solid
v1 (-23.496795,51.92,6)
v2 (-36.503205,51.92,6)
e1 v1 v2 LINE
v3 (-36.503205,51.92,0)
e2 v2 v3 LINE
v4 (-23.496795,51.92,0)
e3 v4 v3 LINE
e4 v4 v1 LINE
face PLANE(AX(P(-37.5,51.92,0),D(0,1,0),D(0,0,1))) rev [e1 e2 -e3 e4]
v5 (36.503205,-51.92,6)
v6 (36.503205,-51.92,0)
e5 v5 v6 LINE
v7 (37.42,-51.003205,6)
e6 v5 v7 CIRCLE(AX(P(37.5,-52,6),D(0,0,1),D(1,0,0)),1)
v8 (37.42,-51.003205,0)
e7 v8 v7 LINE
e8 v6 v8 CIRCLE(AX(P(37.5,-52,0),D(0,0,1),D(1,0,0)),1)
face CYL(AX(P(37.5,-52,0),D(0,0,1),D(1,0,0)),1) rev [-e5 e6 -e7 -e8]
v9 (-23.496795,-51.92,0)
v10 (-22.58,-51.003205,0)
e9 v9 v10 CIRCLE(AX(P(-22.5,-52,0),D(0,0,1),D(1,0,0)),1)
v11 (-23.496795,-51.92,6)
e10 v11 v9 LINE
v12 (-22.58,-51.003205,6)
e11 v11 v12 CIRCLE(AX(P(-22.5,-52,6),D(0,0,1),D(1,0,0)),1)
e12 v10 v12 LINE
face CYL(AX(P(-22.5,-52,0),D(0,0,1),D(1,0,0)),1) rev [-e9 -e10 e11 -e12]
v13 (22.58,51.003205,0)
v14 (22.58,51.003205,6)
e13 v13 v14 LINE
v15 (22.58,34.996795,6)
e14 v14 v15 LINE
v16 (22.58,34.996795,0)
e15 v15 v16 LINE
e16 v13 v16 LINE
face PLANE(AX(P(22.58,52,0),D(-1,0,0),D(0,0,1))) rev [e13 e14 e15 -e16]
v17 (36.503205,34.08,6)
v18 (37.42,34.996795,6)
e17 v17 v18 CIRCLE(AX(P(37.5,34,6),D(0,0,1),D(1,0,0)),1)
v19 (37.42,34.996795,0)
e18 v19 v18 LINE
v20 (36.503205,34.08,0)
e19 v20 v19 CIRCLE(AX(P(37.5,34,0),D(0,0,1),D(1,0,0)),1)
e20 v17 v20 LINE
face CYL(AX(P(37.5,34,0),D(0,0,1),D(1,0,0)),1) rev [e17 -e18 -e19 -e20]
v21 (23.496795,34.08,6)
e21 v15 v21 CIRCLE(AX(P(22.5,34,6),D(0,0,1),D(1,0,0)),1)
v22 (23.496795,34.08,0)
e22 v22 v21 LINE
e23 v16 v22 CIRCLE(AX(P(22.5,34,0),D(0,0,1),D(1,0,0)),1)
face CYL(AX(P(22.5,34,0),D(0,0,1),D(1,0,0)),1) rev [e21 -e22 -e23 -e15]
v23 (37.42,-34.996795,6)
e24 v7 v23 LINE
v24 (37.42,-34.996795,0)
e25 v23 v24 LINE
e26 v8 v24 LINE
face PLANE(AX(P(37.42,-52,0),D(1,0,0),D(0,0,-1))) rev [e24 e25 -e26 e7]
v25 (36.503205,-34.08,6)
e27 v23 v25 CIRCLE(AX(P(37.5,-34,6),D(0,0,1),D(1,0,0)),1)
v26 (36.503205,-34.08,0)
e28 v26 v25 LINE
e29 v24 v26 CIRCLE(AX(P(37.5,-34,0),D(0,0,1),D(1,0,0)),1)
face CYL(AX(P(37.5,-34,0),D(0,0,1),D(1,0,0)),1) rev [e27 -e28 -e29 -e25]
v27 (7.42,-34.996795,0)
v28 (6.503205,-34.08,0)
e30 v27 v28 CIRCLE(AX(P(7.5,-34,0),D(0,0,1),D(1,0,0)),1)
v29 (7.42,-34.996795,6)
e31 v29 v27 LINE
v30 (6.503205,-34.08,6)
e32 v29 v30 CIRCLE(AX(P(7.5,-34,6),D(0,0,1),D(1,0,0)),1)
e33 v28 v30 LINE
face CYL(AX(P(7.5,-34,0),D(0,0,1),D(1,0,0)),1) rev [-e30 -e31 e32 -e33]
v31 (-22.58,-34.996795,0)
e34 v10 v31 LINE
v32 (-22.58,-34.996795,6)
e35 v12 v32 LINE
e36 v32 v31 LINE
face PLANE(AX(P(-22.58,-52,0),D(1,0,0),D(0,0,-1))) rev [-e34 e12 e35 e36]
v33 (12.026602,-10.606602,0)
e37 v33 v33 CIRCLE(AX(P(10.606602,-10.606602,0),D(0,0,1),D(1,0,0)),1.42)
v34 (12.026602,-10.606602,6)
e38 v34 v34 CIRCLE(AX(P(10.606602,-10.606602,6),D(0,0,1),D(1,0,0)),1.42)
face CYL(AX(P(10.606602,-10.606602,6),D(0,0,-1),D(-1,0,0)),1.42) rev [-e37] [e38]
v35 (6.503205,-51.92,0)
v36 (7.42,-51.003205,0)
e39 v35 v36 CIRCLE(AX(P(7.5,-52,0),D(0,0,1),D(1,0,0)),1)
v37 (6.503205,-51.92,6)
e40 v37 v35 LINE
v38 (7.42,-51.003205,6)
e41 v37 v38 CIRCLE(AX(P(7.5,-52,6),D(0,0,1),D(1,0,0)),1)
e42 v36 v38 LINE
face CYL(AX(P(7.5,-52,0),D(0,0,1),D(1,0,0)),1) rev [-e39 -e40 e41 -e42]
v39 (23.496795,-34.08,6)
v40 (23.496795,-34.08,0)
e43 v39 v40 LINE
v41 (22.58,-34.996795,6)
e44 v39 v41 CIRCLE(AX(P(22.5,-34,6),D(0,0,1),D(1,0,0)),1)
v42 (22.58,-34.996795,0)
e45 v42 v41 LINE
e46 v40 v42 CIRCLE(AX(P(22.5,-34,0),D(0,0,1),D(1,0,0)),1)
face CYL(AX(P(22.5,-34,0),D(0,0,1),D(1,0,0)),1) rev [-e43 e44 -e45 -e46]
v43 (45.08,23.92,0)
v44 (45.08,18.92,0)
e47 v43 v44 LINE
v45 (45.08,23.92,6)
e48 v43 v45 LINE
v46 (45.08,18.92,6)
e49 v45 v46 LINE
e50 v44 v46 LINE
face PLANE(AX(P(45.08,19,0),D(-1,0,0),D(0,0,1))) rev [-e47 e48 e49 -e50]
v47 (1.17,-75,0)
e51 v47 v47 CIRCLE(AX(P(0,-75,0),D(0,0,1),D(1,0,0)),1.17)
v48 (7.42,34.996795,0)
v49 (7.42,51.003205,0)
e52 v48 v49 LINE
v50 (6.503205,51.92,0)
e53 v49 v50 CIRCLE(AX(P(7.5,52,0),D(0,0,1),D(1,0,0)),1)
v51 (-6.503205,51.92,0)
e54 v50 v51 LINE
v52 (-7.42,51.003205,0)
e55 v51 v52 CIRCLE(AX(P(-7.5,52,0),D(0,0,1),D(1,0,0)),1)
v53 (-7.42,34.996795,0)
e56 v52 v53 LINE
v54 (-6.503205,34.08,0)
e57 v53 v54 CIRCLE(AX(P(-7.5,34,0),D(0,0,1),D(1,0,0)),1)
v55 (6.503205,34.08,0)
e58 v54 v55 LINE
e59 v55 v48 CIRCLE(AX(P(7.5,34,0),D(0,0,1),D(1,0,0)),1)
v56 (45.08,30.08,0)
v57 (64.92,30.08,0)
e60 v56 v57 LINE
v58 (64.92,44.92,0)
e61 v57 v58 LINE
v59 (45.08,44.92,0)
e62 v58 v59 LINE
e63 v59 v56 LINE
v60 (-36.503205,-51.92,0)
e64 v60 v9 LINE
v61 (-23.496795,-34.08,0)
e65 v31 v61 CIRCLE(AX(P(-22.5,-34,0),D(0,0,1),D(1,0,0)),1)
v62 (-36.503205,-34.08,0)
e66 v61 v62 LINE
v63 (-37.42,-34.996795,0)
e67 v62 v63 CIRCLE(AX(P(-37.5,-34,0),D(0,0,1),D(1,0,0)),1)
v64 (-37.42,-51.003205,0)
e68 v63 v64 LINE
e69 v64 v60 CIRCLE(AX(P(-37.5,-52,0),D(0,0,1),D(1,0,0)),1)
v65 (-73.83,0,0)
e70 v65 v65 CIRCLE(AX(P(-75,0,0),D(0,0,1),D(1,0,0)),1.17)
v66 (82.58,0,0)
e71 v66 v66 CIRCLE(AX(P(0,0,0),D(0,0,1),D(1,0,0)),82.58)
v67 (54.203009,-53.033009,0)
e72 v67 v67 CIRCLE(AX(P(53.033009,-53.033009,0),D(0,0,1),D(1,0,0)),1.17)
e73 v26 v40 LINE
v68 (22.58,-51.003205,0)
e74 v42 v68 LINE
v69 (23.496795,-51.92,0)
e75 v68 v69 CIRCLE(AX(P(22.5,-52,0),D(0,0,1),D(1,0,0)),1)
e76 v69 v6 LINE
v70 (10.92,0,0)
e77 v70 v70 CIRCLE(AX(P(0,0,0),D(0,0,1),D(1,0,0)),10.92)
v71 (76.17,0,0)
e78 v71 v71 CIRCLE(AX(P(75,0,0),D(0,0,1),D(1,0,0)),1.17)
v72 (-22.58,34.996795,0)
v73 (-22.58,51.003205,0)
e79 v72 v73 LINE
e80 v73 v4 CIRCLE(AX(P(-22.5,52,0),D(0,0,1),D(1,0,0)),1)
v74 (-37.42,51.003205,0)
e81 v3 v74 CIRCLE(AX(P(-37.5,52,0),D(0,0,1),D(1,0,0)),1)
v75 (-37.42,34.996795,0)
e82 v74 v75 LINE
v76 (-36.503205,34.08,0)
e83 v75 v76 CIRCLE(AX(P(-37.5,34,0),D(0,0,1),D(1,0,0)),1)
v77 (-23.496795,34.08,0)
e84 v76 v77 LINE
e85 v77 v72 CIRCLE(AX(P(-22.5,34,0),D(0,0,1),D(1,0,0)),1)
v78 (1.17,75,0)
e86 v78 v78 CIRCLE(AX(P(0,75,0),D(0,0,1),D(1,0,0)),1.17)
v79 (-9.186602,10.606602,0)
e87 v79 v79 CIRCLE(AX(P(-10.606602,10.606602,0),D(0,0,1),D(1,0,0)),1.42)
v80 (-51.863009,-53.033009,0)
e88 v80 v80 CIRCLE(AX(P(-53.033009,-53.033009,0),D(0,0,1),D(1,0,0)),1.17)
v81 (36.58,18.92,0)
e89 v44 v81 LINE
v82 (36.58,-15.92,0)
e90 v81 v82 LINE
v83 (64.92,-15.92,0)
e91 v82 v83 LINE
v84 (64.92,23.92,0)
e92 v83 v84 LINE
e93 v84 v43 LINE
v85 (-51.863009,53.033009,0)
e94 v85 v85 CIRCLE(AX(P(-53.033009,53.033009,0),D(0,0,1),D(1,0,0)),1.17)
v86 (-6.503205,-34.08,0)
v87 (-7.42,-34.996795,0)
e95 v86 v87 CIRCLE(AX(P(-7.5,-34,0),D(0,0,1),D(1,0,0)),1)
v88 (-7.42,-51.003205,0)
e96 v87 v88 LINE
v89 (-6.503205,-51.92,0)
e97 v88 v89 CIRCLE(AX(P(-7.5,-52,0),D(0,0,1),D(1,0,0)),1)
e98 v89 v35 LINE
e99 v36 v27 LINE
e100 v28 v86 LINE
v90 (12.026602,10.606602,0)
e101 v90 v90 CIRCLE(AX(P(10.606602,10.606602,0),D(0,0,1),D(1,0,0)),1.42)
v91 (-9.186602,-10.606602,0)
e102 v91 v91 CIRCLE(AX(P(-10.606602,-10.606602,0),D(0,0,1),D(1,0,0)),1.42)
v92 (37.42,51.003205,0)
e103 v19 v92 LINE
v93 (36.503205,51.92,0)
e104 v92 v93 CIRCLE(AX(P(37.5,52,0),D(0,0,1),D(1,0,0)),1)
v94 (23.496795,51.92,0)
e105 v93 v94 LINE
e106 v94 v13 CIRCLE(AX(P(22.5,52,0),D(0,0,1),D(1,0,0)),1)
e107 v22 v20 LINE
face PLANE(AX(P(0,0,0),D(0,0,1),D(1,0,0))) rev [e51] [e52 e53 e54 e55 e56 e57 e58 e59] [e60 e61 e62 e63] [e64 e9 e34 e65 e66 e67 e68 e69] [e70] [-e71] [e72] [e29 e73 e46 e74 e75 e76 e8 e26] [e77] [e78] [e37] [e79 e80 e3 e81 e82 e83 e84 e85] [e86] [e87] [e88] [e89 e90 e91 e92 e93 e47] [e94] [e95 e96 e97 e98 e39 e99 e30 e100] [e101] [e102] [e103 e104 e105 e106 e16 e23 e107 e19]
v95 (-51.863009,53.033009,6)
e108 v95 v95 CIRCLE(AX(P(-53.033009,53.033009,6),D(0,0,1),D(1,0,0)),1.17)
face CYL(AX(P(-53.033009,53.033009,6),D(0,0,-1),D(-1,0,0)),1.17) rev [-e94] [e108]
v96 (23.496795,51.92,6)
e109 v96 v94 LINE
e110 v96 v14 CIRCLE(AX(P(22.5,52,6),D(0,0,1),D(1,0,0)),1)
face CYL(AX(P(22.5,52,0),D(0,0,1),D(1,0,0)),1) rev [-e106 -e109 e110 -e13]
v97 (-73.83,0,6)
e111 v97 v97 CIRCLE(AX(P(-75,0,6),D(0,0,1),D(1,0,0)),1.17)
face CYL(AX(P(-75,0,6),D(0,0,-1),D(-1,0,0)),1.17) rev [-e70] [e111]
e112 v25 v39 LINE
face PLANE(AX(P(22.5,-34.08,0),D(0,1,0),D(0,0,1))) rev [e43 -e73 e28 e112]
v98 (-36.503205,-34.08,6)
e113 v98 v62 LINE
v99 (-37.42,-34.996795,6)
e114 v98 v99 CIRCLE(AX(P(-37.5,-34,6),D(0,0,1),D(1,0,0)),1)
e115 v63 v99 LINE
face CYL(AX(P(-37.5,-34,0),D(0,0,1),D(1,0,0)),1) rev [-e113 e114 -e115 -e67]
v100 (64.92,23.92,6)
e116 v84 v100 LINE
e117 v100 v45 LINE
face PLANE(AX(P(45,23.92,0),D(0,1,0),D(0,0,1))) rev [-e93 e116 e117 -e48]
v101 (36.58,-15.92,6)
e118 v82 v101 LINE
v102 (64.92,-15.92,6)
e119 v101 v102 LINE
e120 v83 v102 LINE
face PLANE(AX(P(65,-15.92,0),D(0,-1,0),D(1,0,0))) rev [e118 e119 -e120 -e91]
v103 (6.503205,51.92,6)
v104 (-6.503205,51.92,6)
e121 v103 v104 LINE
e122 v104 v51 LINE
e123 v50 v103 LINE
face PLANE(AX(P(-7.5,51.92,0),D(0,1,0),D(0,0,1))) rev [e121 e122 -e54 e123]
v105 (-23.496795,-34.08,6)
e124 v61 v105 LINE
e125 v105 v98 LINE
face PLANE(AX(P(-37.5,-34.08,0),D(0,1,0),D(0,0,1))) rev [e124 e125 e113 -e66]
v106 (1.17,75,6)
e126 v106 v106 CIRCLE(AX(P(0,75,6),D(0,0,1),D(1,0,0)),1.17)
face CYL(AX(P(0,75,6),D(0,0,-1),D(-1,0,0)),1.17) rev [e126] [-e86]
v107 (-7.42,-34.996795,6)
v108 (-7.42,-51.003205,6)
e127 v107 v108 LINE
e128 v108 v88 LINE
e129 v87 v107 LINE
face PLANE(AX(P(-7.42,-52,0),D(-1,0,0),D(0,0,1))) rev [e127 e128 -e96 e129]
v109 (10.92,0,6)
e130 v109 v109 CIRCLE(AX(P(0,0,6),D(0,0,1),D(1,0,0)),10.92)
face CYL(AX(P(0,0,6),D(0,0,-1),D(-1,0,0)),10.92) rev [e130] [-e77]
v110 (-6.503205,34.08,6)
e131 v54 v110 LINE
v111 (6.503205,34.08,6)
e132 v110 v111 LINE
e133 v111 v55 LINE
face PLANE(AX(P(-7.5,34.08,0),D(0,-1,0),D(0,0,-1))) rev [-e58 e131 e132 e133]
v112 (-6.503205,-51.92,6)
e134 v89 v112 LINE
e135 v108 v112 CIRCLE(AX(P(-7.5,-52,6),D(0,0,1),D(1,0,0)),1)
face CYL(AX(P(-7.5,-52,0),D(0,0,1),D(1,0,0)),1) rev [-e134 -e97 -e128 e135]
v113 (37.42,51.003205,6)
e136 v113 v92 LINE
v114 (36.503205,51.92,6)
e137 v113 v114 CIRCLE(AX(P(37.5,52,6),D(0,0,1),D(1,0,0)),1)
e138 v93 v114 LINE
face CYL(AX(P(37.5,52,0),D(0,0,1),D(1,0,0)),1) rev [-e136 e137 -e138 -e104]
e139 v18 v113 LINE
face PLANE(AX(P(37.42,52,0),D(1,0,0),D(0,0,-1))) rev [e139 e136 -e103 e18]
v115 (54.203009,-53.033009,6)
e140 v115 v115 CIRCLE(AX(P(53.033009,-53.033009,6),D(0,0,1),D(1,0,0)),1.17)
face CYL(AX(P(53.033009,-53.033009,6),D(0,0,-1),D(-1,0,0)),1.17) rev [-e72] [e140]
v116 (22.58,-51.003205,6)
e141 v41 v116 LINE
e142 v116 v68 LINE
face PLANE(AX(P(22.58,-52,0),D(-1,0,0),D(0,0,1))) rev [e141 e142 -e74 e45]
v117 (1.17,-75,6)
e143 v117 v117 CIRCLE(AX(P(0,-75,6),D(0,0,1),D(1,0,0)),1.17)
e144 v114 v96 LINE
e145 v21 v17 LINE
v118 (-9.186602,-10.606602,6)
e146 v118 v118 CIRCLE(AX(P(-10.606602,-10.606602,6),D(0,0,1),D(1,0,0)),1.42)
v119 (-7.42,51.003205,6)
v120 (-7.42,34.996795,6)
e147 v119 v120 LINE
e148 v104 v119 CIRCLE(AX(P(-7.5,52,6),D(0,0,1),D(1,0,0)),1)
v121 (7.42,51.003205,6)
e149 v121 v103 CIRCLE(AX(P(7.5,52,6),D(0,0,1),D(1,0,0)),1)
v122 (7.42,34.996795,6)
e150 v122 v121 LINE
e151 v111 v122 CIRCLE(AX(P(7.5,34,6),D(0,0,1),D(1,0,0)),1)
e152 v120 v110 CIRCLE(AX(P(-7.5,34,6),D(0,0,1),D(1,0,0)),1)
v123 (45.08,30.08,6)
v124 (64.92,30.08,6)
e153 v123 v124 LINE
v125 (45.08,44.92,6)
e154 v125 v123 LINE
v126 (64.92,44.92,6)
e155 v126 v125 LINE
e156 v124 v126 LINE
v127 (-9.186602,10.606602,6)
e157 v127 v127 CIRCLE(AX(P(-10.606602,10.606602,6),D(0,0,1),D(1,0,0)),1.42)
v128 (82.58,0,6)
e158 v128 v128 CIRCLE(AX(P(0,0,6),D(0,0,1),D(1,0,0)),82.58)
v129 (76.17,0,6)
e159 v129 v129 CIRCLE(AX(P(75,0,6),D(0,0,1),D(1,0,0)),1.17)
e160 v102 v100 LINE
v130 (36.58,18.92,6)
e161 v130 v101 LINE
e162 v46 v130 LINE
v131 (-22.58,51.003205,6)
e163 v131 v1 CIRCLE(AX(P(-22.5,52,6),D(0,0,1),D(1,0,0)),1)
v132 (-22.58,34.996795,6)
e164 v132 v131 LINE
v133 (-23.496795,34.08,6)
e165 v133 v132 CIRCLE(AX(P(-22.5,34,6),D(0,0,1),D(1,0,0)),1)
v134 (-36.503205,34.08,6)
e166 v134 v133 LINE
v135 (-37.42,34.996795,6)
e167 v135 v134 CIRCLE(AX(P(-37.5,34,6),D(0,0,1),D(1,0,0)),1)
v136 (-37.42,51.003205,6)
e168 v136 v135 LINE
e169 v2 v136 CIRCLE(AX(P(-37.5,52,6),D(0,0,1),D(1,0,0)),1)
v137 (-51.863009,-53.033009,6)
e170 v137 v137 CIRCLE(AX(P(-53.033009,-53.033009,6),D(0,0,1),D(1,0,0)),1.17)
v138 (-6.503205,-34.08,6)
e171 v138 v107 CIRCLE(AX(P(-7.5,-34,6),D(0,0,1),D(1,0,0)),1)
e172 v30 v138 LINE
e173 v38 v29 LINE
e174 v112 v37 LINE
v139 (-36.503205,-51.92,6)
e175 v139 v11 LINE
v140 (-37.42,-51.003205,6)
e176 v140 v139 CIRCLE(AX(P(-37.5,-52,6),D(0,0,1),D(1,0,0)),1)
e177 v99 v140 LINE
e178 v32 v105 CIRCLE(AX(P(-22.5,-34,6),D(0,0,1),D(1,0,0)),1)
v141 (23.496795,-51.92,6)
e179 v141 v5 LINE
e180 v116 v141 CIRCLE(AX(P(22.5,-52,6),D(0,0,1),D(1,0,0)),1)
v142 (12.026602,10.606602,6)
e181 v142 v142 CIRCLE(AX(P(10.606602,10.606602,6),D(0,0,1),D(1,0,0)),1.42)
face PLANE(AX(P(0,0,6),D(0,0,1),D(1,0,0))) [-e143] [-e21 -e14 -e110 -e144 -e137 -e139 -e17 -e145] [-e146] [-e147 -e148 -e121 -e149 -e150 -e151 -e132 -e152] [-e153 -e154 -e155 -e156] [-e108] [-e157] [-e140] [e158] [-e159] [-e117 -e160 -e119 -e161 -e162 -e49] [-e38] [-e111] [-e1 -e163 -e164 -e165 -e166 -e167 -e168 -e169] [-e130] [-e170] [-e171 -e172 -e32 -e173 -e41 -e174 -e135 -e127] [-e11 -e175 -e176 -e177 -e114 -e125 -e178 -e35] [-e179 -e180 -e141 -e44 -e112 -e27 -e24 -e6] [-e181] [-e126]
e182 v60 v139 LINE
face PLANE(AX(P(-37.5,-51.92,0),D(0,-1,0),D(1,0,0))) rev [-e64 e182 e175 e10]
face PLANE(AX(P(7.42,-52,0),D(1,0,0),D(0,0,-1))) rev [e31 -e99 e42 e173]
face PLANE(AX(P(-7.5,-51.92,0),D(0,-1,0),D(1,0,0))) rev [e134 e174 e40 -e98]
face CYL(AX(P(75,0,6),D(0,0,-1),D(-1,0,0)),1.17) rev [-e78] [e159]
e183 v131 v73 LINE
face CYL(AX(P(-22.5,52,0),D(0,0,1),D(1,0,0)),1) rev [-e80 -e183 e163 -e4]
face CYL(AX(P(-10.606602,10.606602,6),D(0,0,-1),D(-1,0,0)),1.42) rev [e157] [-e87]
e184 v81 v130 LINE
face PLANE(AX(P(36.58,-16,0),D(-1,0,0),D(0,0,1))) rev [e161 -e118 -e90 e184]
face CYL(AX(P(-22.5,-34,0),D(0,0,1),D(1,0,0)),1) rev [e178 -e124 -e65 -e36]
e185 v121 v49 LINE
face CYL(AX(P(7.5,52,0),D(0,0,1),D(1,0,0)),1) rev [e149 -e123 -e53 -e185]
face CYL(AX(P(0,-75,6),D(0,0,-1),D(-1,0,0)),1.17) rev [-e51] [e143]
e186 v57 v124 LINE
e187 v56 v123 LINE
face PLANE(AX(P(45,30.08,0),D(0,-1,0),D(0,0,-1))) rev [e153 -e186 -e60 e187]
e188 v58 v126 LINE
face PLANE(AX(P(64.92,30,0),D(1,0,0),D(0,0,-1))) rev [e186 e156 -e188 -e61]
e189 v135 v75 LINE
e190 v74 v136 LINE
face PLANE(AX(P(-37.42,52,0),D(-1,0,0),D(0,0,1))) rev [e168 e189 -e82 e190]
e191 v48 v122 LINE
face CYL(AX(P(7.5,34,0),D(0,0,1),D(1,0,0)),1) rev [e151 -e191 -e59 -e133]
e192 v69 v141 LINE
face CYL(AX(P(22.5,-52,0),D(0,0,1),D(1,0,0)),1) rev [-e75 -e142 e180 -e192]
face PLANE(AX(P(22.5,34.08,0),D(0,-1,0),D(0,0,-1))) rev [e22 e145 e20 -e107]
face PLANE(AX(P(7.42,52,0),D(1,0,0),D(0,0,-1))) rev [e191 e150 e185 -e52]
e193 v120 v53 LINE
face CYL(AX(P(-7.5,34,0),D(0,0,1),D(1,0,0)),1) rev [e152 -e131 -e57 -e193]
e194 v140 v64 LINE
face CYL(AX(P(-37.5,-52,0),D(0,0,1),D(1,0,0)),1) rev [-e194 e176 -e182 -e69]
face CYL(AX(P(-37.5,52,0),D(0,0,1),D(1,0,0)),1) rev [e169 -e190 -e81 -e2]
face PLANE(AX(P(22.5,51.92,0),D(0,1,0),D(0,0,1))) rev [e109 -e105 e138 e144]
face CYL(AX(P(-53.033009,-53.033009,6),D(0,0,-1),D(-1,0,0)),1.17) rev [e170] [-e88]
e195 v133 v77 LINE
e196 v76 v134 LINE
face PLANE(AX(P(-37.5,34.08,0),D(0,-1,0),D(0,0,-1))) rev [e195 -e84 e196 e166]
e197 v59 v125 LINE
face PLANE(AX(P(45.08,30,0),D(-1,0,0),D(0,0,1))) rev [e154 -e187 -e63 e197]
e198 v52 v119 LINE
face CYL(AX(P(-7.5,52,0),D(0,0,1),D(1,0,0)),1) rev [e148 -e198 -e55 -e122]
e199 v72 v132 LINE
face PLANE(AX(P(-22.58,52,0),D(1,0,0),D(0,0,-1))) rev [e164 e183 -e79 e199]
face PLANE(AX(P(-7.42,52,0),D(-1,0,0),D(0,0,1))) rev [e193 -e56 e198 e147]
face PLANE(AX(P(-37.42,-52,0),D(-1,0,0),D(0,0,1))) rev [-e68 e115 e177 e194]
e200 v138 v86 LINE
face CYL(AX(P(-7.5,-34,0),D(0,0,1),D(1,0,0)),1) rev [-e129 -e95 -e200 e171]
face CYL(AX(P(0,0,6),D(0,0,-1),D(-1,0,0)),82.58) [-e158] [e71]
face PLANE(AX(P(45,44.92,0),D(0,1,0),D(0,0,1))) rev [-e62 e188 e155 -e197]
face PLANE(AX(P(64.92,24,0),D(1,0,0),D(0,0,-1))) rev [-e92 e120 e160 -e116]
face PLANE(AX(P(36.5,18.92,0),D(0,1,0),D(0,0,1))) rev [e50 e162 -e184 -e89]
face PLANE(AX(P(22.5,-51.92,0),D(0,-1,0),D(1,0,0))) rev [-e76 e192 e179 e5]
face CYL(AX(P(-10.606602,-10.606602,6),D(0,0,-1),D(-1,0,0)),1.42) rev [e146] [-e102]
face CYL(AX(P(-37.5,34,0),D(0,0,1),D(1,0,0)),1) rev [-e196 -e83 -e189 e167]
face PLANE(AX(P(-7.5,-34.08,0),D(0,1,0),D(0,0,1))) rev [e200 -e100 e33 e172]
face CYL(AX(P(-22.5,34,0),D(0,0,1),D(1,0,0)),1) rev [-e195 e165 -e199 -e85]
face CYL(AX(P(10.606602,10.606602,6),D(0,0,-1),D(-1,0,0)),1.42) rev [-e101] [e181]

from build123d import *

# Parameters (mm, degrees)
SKETCH1_R              = 82.5
SKETCH1_R_2            = 11
SKETCH1_R_3            = 1.5
SKETCH1_R_4            = 1.25
BOSS_EXTRUDE1_DEPTH    = 6
SKETCH8_W              = 20
SKETCH8_H              = 15
CUT_EXTRUDE5_DEPTH     = 117.826794872
SKETCH9_W              = 15
SKETCH9_H              = 18
CUT_EXTRUDE6_DEPTH     = 117.826794872
SKETCH10_R             = 1
CUT_EXTRUDE7_DEPTH     = 117.826794872
MOVE_FACE1_OUTLINE_R   = 82.58
MOVE_FACE1_OUTLINE_R_2 = 82.5
MOVE_FACE1_OUTLINE_R_3 = 11
MOVE_FACE1_OUTLINE_R_4 = 10.92
MOVE_FACE1_OUTLINE_R_5 = 1.5
MOVE_FACE1_OUTLINE_R_6 = 1.42
MOVE_FACE1_OUTLINE_R_7 = 1.25
MOVE_FACE1_OUTLINE_R_8 = 1.17
MOVE_FACE1_OUTLINE_W   = 20
MOVE_FACE1_OUTLINE_H   = 15
MOVE_FACE1_OUTLINE_W_2 = 19.84
MOVE_FACE1_OUTLINE_H_2 = 14.84
MOVE_FACE1_DEPTH       = 6


with BuildPart() as part:
    # Sketch1 → Boss-Extrude1 (new body)
    with BuildSketch(Plane.XY):
        Circle(SKETCH1_R)
        Circle(SKETCH1_R_2, mode=Mode.SUBTRACT)
        with Locations((10.606601718, -10.606601718)):
            Circle(SKETCH1_R_3, mode=Mode.SUBTRACT)
        with Locations((0, -75)):
            Circle(SKETCH1_R_4, mode=Mode.SUBTRACT)
        with Locations((-10.606601718, -10.606601718)):
            Circle(SKETCH1_R_3, mode=Mode.SUBTRACT)
        with Locations((-10.606601718, 10.606601718)):
            Circle(SKETCH1_R_3, mode=Mode.SUBTRACT)
        with Locations((10.606601718, 10.606601718)):
            Circle(SKETCH1_R_3, mode=Mode.SUBTRACT)
        with Locations((-53.033008589, -53.033008589)):
            Circle(SKETCH1_R_4, mode=Mode.SUBTRACT)
        with Locations((-75, 0)):
            Circle(SKETCH1_R_4, mode=Mode.SUBTRACT)
        with Locations((-53.033008589, 53.033008589)):
            Circle(SKETCH1_R_4, mode=Mode.SUBTRACT)
        with Locations((0, 75)):
            Circle(SKETCH1_R_4, mode=Mode.SUBTRACT)
        with Locations((75, 0)):
            Circle(SKETCH1_R_4, mode=Mode.SUBTRACT)
        with Locations((53.033008589, -53.033008589)):
            Circle(SKETCH1_R_4, mode=Mode.SUBTRACT)
    extrude(amount=BOSS_EXTRUDE1_DEPTH)

    # Sketch8 → Cut-Extrude5 (cut, through all)
    with BuildSketch(Plane.XY.offset(6)):
        Polygon((45, 24), (65, 24), (65, -16), (36.5, -16), (36.5, 19), (45, 19), align=None)
        with Locations((55, 37.5)):
            Rectangle(SKETCH8_W, SKETCH8_H)
    extrude(amount=-CUT_EXTRUDE5_DEPTH, mode=Mode.SUBTRACT)

    # Sketch9 → Cut-Extrude6 (cut, through all)
    with BuildSketch(Plane.XY.offset(6)):
        with Locations((-30, -43)):
            Rectangle(SKETCH9_W, SKETCH9_H)
        with Locations((-30, 43)):
            Rectangle(SKETCH9_W, SKETCH9_H)
        with Locations((30, 43)):
            Rectangle(SKETCH9_W, SKETCH9_H)
        with Locations((0, -43)):
            Rectangle(SKETCH9_W, SKETCH9_H)
        with Locations((30, -43)):
            Rectangle(SKETCH9_W, SKETCH9_H)
        with Locations((0, 43)):
            Rectangle(SKETCH9_W, SKETCH9_H)
    extrude(amount=-CUT_EXTRUDE6_DEPTH, mode=Mode.SUBTRACT)

    # Sketch10 → Cut-Extrude7 (cut, through all)
    with BuildSketch(Plane.XY.offset(6)):
        with Locations((-37.5, 52)):
            Circle(SKETCH10_R)
        with Locations((-22.5, 52)):
            Circle(SKETCH10_R)
        with Locations((-37.5, 34)):
            Circle(SKETCH10_R)
        with Locations((-22.5, 34)):
            Circle(SKETCH10_R)
        with Locations((-7.5, 52)):
            Circle(SKETCH10_R)
        with Locations((7.5, 52)):
            Circle(SKETCH10_R)
        with Locations((-7.5, 34)):
            Circle(SKETCH10_R)
        with Locations((7.5, 34)):
            Circle(SKETCH10_R)
        with Locations((22.5, 52)):
            Circle(SKETCH10_R)
        with Locations((37.5, 52)):
            Circle(SKETCH10_R)
        with Locations((22.5, 34)):
            Circle(SKETCH10_R)
        with Locations((37.5, 34)):
            Circle(SKETCH10_R)
        with Locations((-37.5, -34)):
            Circle(SKETCH10_R)
        with Locations((-22.5, -34)):
            Circle(SKETCH10_R)
        with Locations((-37.5, -52)):
            Circle(SKETCH10_R)
        with Locations((-22.5, -52)):
            Circle(SKETCH10_R)
        with Locations((-7.5, -34)):
            Circle(SKETCH10_R)
        with Locations((7.5, -34)):
            Circle(SKETCH10_R)
        with Locations((-7.5, -52)):
            Circle(SKETCH10_R)
        with Locations((7.5, -52)):
            Circle(SKETCH10_R)
        with Locations((22.5, -34)):
            Circle(SKETCH10_R)
        with Locations((37.5, -34)):
            Circle(SKETCH10_R)
        with Locations((22.5, -52)):
            Circle(SKETCH10_R)
        with Locations((37.5, -52)):
            Circle(SKETCH10_R)
    extrude(amount=-CUT_EXTRUDE7_DEPTH, mode=Mode.SUBTRACT)

    # Move Face1: read off the stored shape, not the designer's step
    # Move Face1 outline → Move Face1 (add)
    # profile 1 of 39: a face of its own
    with BuildSketch(Plane.XY):
        Circle(MOVE_FACE1_OUTLINE_R)
        Circle(MOVE_FACE1_OUTLINE_R_2, mode=Mode.SUBTRACT)
    # profile 2 of 39: a face of its own
    with BuildSketch(Plane.XY):
        with BuildLine():
            Line((-37.42, -51.003205136), (-37.42, -34.996794864))
            ThreePointArc((-37.42, -34.996794864), (-37.45996791, -34.999198395), (-37.5, -35))
            Line((-37.5, -35), (-37.5, -51))
            ThreePointArc((-37.5, -51), (-37.45996791, -51.000801605), (-37.42, -51.003205136))
        make_face()
    # profile 3 of 39: a face of its own
    with BuildSketch(Plane.XY):
        with BuildLine():
            Line((-23.5, -34), (-36.5, -34))
            ThreePointArc((-36.5, -34), (-36.500801605, -34.04003209), (-36.503205136, -34.08))
            Line((-36.503205136, -34.08), (-23.496794864, -34.08))
            ThreePointArc((-23.496794864, -34.08), (-23.499198395, -34.04003209), (-23.5, -34))
        make_face()
    # profile 4 of 39: a face of its own
    with BuildSketch(Plane.XY):
        with BuildLine():
            ThreePointArc((-36.503205136, -51.92), (-36.500801605, -51.95996791), (-36.5, -52))
            Line((-36.5, -52), (-23.5, -52))
            ThreePointArc((-23.5, -52), (-23.499198395, -51.95996791), (-23.496794864, -51.92))
            Line((-23.496794864, -51.92), (-36.503205136, -51.92))
        make_face()
    # profile 5 of 39: a face of its own
    with BuildSketch(Plane.XY):
        with BuildLine():
            Line((-22.5, -51), (-22.5, -35))
            ThreePointArc((-22.5, -35), (-22.54003209, -34.999198395), (-22.58, -34.996794864))
            Line((-22.58, -34.996794864), (-22.58, -51.003205136))
            ThreePointArc((-22.58, -51.003205136), (-22.54003209, -51.000801605), (-22.5, -51))
        make_face()
    # profile 6 of 39: a face of its own
    with BuildSketch(Plane.XY):
        with BuildLine():
            Line((-37.42, 34.996794864), (-37.42, 51.003205136))
            ThreePointArc((-37.42, 51.003205136), (-37.45996791, 51.000801605), (-37.5, 51))
            Line((-37.5, 51), (-37.5, 35))
            ThreePointArc((-37.5, 35), (-37.45996791, 34.999198395), (-37.42, 34.996794864))
        make_face()
    # profile 7 of 39: a face of its own
    with BuildSketch(Plane.XY):
        with BuildLine():
            Line((-23.5, 52), (-36.5, 52))
            ThreePointArc((-36.5, 52), (-36.500801605, 51.95996791), (-36.503205136, 51.92))
            Line((-36.503205136, 51.92), (-23.496794864, 51.92))
            ThreePointArc((-23.496794864, 51.92), (-23.499198395, 51.95996791), (-23.5, 52))
        make_face()
    # profile 8 of 39: a face of its own
    with BuildSketch(Plane.XY):
        with BuildLine():
            ThreePointArc((-36.503205136, 34.08), (-36.500801605, 34.04003209), (-36.5, 34))
            Line((-36.5, 34), (-23.5, 34))
            ThreePointArc((-23.5, 34), (-23.499198395, 34.04003209), (-23.496794864, 34.08))
            Line((-23.496794864, 34.08), (-36.503205136, 34.08))
        make_face()
    # profile 9 of 39: a face of its own
    with BuildSketch(Plane.XY):
        with BuildLine():
            Line((-22.5, 35), (-22.5, 51))
            ThreePointArc((-22.5, 51), (-22.54003209, 51.000801605), (-22.58, 51.003205136))
            Line((-22.58, 51.003205136), (-22.58, 34.996794864))
            ThreePointArc((-22.58, 34.996794864), (-22.54003209, 34.999198395), (-22.5, 35))
        make_face()
    # profile 10 of 39: a face of its own
    with BuildSketch(Plane.XY):
        with BuildLine():
            Line((-6.503205136, -34.08), (6.503205136, -34.08))
            ThreePointArc((6.503205136, -34.08), (6.500801605, -34.04003209), (6.5, -34))
            Line((6.5, -34), (-6.5, -34))
            ThreePointArc((-6.5, -34), (-6.500801605, -34.04003209), (-6.503205136, -34.08))
        make_face()
    # profile 11 of 39: a face of its own
    with BuildSketch(Plane.XY):
        with BuildLine():
            Line((7.5, -51), (7.5, -35))
            ThreePointArc((7.5, -35), (7.45996791, -34.999198395), (7.42, -34.996794864))
            Line((7.42, -34.996794864), (7.42, -51.003205136))
            ThreePointArc((7.42, -51.003205136), (7.45996791, -51.000801605), (7.5, -51))
        make_face()
    # profile 12 of 39: a face of its own
    with BuildSketch(Plane.XY):
        with BuildLine():
            ThreePointArc((-7.42, -34.996794864), (-7.45996791, -34.999198395), (-7.5, -35))
            Line((-7.5, -35), (-7.5, -51))
            ThreePointArc((-7.5, -51), (-7.45996791, -51.000801605), (-7.42, -51.003205136))
            Line((-7.42, -51.003205136), (-7.42, -34.996794864))
        make_face()
    # profile 13 of 39: a face of its own
    with BuildSketch(Plane.XY):
        with BuildLine():
            Line((-6.5, -52), (6.5, -52))
            ThreePointArc((6.5, -52), (6.500801605, -51.95996791), (6.503205136, -51.92))
            Line((6.503205136, -51.92), (-6.503205136, -51.92))
            ThreePointArc((-6.503205136, -51.92), (-6.500801605, -51.95996791), (-6.5, -52))
        make_face()
    # profile 14 of 39: a face of its own
    with BuildSketch(Plane.XY):
        with BuildLine():
            Line((23.496794864, -34.08), (36.503205136, -34.08))
            ThreePointArc((36.503205136, -34.08), (36.500801605, -34.04003209), (36.5, -34))
            Line((36.5, -34), (23.5, -34))
            ThreePointArc((23.5, -34), (23.499198395, -34.04003209), (23.496794864, -34.08))
        make_face()
    # profile 15 of 39: a face of its own
    with BuildSketch(Plane.XY):
        with BuildLine():
            Line((37.5, -51), (37.5, -35))
            ThreePointArc((37.5, -35), (37.45996791, -34.999198395), (37.42, -34.996794864))
            Line((37.42, -34.996794864), (37.42, -51.003205136))
            ThreePointArc((37.42, -51.003205136), (37.45996791, -51.000801605), (37.5, -51))
        make_face()
    # profile 16 of 39: a face of its own
    with BuildSketch(Plane.XY):
        with BuildLine():
            ThreePointArc((22.58, -34.996794864), (22.54003209, -34.999198395), (22.5, -35))
            Line((22.5, -35), (22.5, -51))
            ThreePointArc((22.5, -51), (22.54003209, -51.000801605), (22.58, -51.003205136))
            Line((22.58, -51.003205136), (22.58, -34.996794864))
        make_face()
    # profile 17 of 39: a face of its own
    with BuildSketch(Plane.XY):
        with BuildLine():
            Line((23.5, -52), (36.5, -52))
            ThreePointArc((36.5, -52), (36.500801605, -51.95996791), (36.503205136, -51.92))
            Line((36.503205136, -51.92), (23.496794864, -51.92))
            ThreePointArc((23.496794864, -51.92), (23.499198395, -51.95996791), (23.5, -52))
        make_face()
    # profile 18 of 39: a face of its own
    with BuildSketch(Plane.XY):
        with BuildLine():
            Line((23.496794864, 51.92), (36.503205136, 51.92))
            ThreePointArc((36.503205136, 51.92), (36.500801605, 51.95996791), (36.5, 52))
            Line((36.5, 52), (23.5, 52))
            ThreePointArc((23.5, 52), (23.499198395, 51.95996791), (23.496794864, 51.92))
        make_face()
    # profile 19 of 39: a face of its own
    with BuildSketch(Plane.XY):
        with BuildLine():
            Line((37.5, 35), (37.5, 51))
            ThreePointArc((37.5, 51), (37.45996791, 51.000801605), (37.42, 51.003205136))
            Line((37.42, 51.003205136), (37.42, 34.996794864))
            ThreePointArc((37.42, 34.996794864), (37.45996791, 34.999198395), (37.5, 35))
        make_face()
    # profile 20 of 39: a face of its own
    with BuildSketch(Plane.XY):
        with BuildLine():
            ThreePointArc((22.58, 51.003205136), (22.54003209, 51.000801605), (22.5, 51))
            Line((22.5, 51), (22.5, 35))
            ThreePointArc((22.5, 35), (22.54003209, 34.999198395), (22.58, 34.996794864))
            Line((22.58, 34.996794864), (22.58, 51.003205136))
        make_face()
    # profile 21 of 39: a face of its own
    with BuildSketch(Plane.XY):
        with BuildLine():
            Line((23.5, 34), (36.5, 34))
            ThreePointArc((36.5, 34), (36.500801605, 34.04003209), (36.503205136, 34.08))
            Line((36.503205136, 34.08), (23.496794864, 34.08))
            ThreePointArc((23.496794864, 34.08), (23.499198395, 34.04003209), (23.5, 34))
        make_face()
    # profile 22 of 39: a face of its own
    with BuildSketch(Plane.XY):
        with BuildLine():
            Line((-6.503205136, 51.92), (6.503205136, 51.92))
            ThreePointArc((6.503205136, 51.92), (6.500801605, 51.95996791), (6.5, 52))
            Line((6.5, 52), (-6.5, 52))
            ThreePointArc((-6.5, 52), (-6.500801605, 51.95996791), (-6.503205136, 51.92))
        make_face()
    # profile 23 of 39: a face of its own
    with BuildSketch(Plane.XY):
        with BuildLine():
            Line((7.5, 35), (7.5, 51))
            ThreePointArc((7.5, 51), (7.45996791, 51.000801605), (7.42, 51.003205136))
            Line((7.42, 51.003205136), (7.42, 34.996794864))
            ThreePointArc((7.42, 34.996794864), (7.45996791, 34.999198395), (7.5, 35))
        make_face()
    # profile 24 of 39: a face of its own
    with BuildSketch(Plane.XY):
        with BuildLine():
            ThreePointArc((-7.42, 51.003205136), (-7.45996791, 51.000801605), (-7.5, 51))
            Line((-7.5, 51), (-7.5, 35))
            ThreePointArc((-7.5, 35), (-7.45996791, 34.999198395), (-7.42, 34.996794864))
            Line((-7.42, 34.996794864), (-7.42, 51.003205136))
        make_face()
    # profile 25 of 39: a face of its own
    with BuildSketch(Plane.XY):
        with BuildLine():
            Line((-6.5, 34), (6.5, 34))
            ThreePointArc((6.5, 34), (6.500801605, 34.04003209), (6.503205136, 34.08))
            Line((6.503205136, 34.08), (-6.503205136, 34.08))
            ThreePointArc((-6.503205136, 34.08), (-6.500801605, 34.04003209), (-6.5, 34))
        make_face()
    # profile 26 of 39: a face of its own
    with BuildSketch(Plane.XY):
        Circle(MOVE_FACE1_OUTLINE_R_3)
        Circle(MOVE_FACE1_OUTLINE_R_4, mode=Mode.SUBTRACT)
    # profile 27 of 39: a face of its own
    with BuildSketch(Plane.XY):
        with Locations((10.606601718, -10.606601718)):
            Circle(MOVE_FACE1_OUTLINE_R_5)
        with Locations((10.606601718, -10.606601718)):
            Circle(MOVE_FACE1_OUTLINE_R_6, mode=Mode.SUBTRACT)
    # profile 28 of 39: a face of its own
    with BuildSketch(Plane.XY):
        with Locations((0, -75)):
            Circle(MOVE_FACE1_OUTLINE_R_7)
        with Locations((0, -75)):
            Circle(MOVE_FACE1_OUTLINE_R_8, mode=Mode.SUBTRACT)
    # profile 29 of 39: a face of its own
    with BuildSketch(Plane.XY):
        with Locations((-10.606601718, -10.606601718)):
            Circle(MOVE_FACE1_OUTLINE_R_5)
        with Locations((-10.606601718, -10.606601718)):
            Circle(MOVE_FACE1_OUTLINE_R_6, mode=Mode.SUBTRACT)
    # profile 30 of 39: a face of its own
    with BuildSketch(Plane.XY):
        with Locations((-10.606601718, 10.606601718)):
            Circle(MOVE_FACE1_OUTLINE_R_5)
        with Locations((-10.606601718, 10.606601718)):
            Circle(MOVE_FACE1_OUTLINE_R_6, mode=Mode.SUBTRACT)
    # profile 31 of 39: a face of its own
    with BuildSketch(Plane.XY):
        with Locations((10.606601718, 10.606601718)):
            Circle(MOVE_FACE1_OUTLINE_R_5)
        with Locations((10.606601718, 10.606601718)):
            Circle(MOVE_FACE1_OUTLINE_R_6, mode=Mode.SUBTRACT)
    # profile 32 of 39: a face of its own
    with BuildSketch(Plane.XY):
        with Locations((-53.033008589, -53.033008589)):
            Circle(MOVE_FACE1_OUTLINE_R_7)
        with Locations((-53.033008589, -53.033008589)):
            Circle(MOVE_FACE1_OUTLINE_R_8, mode=Mode.SUBTRACT)
    # profile 33 of 39: a face of its own
    with BuildSketch(Plane.XY):
        with Locations((-75, 0)):
            Circle(MOVE_FACE1_OUTLINE_R_7)
        with Locations((-75, 0)):
            Circle(MOVE_FACE1_OUTLINE_R_8, mode=Mode.SUBTRACT)
    # profile 34 of 39: a face of its own
    with BuildSketch(Plane.XY):
        with Locations((-53.033008589, 53.033008589)):
            Circle(MOVE_FACE1_OUTLINE_R_7)
        with Locations((-53.033008589, 53.033008589)):
            Circle(MOVE_FACE1_OUTLINE_R_8, mode=Mode.SUBTRACT)
    # profile 35 of 39: a face of its own
    with BuildSketch(Plane.XY):
        with Locations((0, 75)):
            Circle(MOVE_FACE1_OUTLINE_R_7)
        with Locations((0, 75)):
            Circle(MOVE_FACE1_OUTLINE_R_8, mode=Mode.SUBTRACT)
    # profile 36 of 39: a face of its own
    with BuildSketch(Plane.XY):
        with Locations((75, 0)):
            Circle(MOVE_FACE1_OUTLINE_R_7)
        with Locations((75, 0)):
            Circle(MOVE_FACE1_OUTLINE_R_8, mode=Mode.SUBTRACT)
    # profile 37 of 39: a face of its own
    with BuildSketch(Plane.XY):
        with Locations((53.033008589, -53.033008589)):
            Circle(MOVE_FACE1_OUTLINE_R_7)
        with Locations((53.033008589, -53.033008589)):
            Circle(MOVE_FACE1_OUTLINE_R_8, mode=Mode.SUBTRACT)
    # profile 38 of 39: a face of its own
    with BuildSketch(Plane.XY):
        with Locations((55, 37.5)):
            Rectangle(MOVE_FACE1_OUTLINE_W, MOVE_FACE1_OUTLINE_H)
        with Locations((55, 37.5)):
            Rectangle(MOVE_FACE1_OUTLINE_W_2, MOVE_FACE1_OUTLINE_H_2, mode=Mode.SUBTRACT)
    # profile 39 of 39: a face of its own
    with BuildSketch(Plane.XY):
        Polygon((65, 24), (45, 24), (45, 19), (36.5, 19), (36.5, -16), (65, -16), align=None)
        Polygon((45.08, 18.92), (45.08, 23.92), (64.92, 23.92), (64.92, -15.92), (36.58, -15.92), (36.58, 18.92), align=None, mode=Mode.SUBTRACT)
    extrude(amount=MOVE_FACE1_DEPTH)


solid = part.part
